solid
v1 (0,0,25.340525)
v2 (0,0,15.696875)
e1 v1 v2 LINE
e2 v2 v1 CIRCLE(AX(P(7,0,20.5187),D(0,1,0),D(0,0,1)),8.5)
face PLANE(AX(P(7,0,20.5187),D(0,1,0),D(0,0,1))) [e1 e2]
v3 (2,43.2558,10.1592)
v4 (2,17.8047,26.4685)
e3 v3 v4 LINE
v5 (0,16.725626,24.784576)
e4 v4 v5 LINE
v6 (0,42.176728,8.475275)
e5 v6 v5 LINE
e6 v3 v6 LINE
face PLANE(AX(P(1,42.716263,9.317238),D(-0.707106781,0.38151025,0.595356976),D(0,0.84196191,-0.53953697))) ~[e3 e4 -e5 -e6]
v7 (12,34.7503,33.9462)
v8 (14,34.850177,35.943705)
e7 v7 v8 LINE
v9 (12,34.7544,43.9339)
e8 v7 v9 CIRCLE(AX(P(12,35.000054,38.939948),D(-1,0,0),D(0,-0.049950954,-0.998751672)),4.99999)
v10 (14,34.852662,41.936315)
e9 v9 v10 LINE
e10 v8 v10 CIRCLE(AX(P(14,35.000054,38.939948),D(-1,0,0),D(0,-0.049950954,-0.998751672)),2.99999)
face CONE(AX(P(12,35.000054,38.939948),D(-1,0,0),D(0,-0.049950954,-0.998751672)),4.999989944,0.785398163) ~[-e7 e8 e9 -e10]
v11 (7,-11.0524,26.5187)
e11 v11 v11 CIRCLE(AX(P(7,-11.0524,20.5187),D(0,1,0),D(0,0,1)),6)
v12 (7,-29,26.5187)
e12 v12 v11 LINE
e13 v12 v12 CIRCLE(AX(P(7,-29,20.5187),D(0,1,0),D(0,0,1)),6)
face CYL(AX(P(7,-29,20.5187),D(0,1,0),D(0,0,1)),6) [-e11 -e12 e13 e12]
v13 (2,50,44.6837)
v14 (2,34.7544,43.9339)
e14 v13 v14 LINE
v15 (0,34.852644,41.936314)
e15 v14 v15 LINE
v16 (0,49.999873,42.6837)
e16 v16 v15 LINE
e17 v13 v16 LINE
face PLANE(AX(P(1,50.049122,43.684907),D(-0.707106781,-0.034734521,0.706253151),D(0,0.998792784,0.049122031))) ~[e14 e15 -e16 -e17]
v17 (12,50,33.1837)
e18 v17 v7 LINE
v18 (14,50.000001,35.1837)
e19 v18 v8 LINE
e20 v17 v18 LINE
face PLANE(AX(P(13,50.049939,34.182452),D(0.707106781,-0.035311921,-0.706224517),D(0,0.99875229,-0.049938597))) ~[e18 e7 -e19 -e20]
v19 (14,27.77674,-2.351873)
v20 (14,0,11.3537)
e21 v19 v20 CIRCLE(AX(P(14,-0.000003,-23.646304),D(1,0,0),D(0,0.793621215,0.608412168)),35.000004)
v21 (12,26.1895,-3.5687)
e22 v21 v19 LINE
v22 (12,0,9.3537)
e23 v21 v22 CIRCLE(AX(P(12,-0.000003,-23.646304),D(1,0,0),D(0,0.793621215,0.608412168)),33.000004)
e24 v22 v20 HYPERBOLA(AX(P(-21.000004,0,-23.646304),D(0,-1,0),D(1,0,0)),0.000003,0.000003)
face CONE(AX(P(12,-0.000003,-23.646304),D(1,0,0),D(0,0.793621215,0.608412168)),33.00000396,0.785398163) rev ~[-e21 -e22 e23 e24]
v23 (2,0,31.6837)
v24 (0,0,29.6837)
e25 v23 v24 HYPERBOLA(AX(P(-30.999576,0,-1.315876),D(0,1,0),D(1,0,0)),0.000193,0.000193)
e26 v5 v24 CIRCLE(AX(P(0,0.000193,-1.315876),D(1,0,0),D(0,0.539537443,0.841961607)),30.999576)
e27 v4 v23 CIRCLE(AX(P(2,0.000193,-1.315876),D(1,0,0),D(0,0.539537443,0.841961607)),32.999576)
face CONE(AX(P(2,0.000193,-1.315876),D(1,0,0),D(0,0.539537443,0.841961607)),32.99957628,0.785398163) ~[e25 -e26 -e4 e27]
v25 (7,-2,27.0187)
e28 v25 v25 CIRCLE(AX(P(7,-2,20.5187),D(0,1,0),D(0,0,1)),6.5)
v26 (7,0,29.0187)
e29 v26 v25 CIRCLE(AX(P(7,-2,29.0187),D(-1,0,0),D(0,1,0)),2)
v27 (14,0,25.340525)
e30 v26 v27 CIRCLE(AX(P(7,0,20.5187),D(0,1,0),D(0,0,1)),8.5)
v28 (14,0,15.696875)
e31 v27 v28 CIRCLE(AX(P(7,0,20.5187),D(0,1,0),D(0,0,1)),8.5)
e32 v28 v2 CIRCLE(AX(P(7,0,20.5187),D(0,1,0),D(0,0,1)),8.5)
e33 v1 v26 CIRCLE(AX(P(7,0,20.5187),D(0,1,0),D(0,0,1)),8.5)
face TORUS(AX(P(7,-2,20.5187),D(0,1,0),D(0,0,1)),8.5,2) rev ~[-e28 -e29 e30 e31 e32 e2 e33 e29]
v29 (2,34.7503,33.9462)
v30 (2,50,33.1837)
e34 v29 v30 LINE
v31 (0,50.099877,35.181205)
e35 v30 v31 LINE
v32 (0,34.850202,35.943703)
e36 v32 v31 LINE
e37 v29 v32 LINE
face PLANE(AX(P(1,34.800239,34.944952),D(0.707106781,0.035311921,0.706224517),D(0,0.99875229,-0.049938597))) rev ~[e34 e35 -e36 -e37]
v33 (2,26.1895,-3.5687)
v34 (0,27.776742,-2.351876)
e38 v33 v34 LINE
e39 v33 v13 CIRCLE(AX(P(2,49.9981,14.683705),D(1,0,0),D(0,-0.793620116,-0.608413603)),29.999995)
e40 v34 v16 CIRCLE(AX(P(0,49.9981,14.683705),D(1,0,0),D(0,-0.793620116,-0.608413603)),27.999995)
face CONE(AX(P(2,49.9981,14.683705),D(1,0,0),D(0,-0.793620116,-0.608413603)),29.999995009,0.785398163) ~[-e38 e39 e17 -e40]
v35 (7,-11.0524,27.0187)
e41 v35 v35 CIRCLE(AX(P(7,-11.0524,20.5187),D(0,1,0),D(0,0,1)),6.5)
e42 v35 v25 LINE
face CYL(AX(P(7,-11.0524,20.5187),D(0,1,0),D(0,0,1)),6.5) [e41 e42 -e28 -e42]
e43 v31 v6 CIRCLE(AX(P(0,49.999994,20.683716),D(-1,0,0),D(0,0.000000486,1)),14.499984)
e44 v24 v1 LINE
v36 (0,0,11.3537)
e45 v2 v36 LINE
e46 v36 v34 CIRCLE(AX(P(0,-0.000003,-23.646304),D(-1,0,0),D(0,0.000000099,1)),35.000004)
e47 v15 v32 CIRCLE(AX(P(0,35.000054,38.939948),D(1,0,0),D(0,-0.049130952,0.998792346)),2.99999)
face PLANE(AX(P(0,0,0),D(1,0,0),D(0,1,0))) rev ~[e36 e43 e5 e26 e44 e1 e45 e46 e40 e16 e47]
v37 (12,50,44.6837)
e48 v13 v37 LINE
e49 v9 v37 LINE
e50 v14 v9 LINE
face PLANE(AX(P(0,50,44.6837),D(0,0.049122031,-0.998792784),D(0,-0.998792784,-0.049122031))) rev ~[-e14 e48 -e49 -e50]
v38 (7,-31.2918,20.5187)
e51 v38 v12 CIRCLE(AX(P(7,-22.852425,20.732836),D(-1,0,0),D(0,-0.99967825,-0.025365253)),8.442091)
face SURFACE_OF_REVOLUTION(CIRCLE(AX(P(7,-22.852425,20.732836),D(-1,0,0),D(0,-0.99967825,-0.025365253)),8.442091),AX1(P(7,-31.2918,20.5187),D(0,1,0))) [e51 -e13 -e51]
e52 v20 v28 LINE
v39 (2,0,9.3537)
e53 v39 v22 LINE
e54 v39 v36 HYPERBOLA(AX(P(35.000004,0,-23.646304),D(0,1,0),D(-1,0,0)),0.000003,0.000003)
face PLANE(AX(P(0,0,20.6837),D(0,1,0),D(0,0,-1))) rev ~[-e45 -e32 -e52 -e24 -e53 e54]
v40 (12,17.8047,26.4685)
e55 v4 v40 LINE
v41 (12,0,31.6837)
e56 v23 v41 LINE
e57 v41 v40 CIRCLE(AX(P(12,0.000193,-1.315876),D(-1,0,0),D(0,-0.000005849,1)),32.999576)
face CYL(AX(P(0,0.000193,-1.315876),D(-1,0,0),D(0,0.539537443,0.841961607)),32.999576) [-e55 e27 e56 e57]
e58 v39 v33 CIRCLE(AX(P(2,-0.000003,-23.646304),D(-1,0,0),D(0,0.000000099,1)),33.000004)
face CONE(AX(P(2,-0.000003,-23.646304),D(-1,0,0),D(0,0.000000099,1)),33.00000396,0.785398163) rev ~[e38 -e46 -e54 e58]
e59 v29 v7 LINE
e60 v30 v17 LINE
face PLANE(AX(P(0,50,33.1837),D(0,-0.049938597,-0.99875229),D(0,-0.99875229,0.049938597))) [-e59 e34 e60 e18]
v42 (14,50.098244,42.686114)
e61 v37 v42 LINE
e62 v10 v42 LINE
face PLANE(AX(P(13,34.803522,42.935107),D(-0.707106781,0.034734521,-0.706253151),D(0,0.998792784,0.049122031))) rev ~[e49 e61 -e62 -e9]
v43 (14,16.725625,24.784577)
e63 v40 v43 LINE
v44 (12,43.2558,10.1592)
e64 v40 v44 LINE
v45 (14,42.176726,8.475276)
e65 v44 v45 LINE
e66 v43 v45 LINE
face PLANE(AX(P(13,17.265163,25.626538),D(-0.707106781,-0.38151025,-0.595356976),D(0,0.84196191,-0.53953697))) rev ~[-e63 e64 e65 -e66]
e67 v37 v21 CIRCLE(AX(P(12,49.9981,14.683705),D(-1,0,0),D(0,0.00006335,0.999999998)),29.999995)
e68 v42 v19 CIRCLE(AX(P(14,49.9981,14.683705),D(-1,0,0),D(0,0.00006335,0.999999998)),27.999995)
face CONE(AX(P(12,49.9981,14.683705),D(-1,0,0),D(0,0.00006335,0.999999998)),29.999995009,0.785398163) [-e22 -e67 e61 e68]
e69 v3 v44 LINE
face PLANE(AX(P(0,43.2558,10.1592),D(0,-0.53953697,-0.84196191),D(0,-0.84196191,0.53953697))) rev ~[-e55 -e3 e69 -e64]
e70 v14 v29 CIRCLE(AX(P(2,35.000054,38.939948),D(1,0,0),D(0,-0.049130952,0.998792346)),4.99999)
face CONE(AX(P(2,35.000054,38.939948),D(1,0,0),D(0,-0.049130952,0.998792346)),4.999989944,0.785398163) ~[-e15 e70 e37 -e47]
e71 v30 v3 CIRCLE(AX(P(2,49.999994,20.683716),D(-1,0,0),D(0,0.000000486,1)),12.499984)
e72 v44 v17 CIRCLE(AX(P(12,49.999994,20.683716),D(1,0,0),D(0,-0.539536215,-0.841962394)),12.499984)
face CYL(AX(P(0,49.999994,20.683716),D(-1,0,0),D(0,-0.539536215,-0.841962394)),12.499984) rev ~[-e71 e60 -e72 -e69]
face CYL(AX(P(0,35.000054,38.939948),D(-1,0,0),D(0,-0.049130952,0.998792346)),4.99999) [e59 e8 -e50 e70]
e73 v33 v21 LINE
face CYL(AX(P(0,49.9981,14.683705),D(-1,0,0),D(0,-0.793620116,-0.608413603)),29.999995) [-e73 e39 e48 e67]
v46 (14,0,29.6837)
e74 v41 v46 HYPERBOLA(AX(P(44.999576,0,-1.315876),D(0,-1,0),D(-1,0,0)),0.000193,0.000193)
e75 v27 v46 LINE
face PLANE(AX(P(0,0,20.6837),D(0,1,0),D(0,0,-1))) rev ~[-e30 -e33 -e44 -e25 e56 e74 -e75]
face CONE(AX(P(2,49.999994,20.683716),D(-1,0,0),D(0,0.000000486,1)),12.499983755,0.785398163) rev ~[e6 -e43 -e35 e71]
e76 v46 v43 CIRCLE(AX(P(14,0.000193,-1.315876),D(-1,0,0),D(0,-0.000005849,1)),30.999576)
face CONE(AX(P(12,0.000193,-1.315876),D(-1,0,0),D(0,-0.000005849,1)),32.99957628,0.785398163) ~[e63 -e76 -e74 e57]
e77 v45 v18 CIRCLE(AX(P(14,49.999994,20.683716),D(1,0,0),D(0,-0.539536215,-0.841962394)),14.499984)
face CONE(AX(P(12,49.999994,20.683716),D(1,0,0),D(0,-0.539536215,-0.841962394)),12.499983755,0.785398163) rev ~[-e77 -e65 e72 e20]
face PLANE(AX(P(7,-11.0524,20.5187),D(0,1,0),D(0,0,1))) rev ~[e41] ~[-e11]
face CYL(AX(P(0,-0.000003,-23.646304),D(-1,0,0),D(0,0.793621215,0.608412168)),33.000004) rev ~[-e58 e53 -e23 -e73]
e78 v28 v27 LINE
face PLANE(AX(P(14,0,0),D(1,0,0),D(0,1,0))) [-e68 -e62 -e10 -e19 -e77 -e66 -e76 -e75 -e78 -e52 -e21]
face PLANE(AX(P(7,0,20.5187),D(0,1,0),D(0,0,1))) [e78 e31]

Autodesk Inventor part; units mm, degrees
ref_plane "YZ Plane" through (0, 0, 0) normal (1, 0, 0) x (0, 1, 0)
ref_plane "XZ Plane" through (0, 0, 0) normal (0, 1, 0) x (-1, 0, 0)
sketch "Sketch1" plane through (0, 0, 0) normal (1, 0, 0) x (0, 1, 0)
  arc A0 (26.1895, -3.5687) -> (0, 9.3537) centre (0, -23.6463) ccw
  arc A1 (17.8047, 26.4685) -> (0, 31.6837) centre (0, -1.3163) ccw
  line L0 (91.8773, 20.6837) -> (-78.3169, 20.6837)
  arc A2 (43.2558, 10.1592) -> (50, 33.1837) centre (50, 20.6837) ccw
  arc A3 (26.1895, -3.5687) -> (50, 44.6837) centre (49.9981, 14.6837) ccw
  line L1 (43.2558, 10.1592) -> (17.8047, 26.4685)
  line L2 (0, 54.8963) -> (0, -73.9166)
  line L3 (50, 20.6837) -> (50, 74.3533) construction
  line L4 (50, 44.6837) -> (50, 33.1837)
  arc A4 (34.7544, 43.9339) -> (34.7503, 33.9462) centre (35, 38.94) ccw
  line L5 (50, 44.6837) -> (34.7544, 43.9339)
  line L6 (50, 33.1837) -> (34.7503, 33.9462)
  point P0 (0, 0)
  point P1 (0, 20.6837)
  dimension "d0" = 66
  dimension "d1" = 66
  dimension "d2" = 22.33
  dimension "d3" = 22
  dimension "d4" = 25
  dimension "d5" = 50
  dimension "d6" = 60
  dimension "d7" = 6
  dimension "d8" = 10
  dimension "d9" = 15
extrude "Extrusion1" add sketch "Sketch1" along normal blind 14 contours A0 L2 L0 L1 A2 A3 | L0 A2 L4 A3 | L2 A1 L1 L0 | L4 L6 A4 L5
chamfer "Chamfer1" distance 2 angle 45 16 edges at (14, 76.901, 1.4083) (14, 14.602, 5.9473) (0, 76.901, 1.4083) (0, 14.602, 5.9473) (14, 42.3752, 33.565) (14, 30, 38.942) (14, 42.3772, 44.3088) (14, 61.996, 17.1699) (14, 30.5303, 18.3138) (14, 9.2764, 30.3531) (0, 42.3772, 44.3088) (0, 30, 38.942) (0, 42.3752, 33.565) (0, 30.5303, 18.3138) (0, 9.2764, 30.3531) (0, 61.996, 17.1699)
ref_plane "Work Plane1" through (7, 0, 0) normal (-1, 0, 0) x (0, 0, 1)
sketch "Sketch2" plane through (7, 0, 0) normal (-1, 0, 0) x (0, 0, 1)
  line L0 (29.6837, 0) -> (11.3537, 0) projected
  line L1 (26.5187, 0) -> (14.5187, 0)
  line L2 (26.5187, -29) -> (26.5187, -11.0524)
  line L3 (27.0187, -11.0524) -> (27.0187, -2)
  line L4 (29.0187, 0) -> (30.2528, 0)
  line L5 (12.0186, 0) -> (11.3537, 0)
  arc A0 (29.0187, 0) -> (27.0187, -2) centre (29.0187, -2) ccw
  line L6 (20.5187, -31.2918) -> (20.5187, 0)
  line L7 (29.0187, 0) -> (12.0186, 0)
  line L8 (27.0187, -11.0524) -> (26.5187, -11.0524)
  arc A1 (20.5187, -31.2918) -> (26.5187, -29) centre (20.7329, -22.8528) ccw
  line L9 (29.0187, 0) -> (20.5187, 0)
  point P0 (0, 0)
  point P1 (27.0187, 0)
  dimension "d19" = 0.5
  dimension "d20" = 2
  dimension "d21" = 6
  dimension "d22" = 31.2918
revolve "Revolution1" add sketch "Sketch2" angle 360 about axis through (7, -31.2918, 20.5187) along (0, 1, 0)
thread "Thread1" size "M12x1.75" class "6g" standard "ISO Metric profile" length 13
thread "Thread2" size "M12x1.75" class "6g" standard "ANSI Metric M Profile" length 13
properties part number "Gancho"
